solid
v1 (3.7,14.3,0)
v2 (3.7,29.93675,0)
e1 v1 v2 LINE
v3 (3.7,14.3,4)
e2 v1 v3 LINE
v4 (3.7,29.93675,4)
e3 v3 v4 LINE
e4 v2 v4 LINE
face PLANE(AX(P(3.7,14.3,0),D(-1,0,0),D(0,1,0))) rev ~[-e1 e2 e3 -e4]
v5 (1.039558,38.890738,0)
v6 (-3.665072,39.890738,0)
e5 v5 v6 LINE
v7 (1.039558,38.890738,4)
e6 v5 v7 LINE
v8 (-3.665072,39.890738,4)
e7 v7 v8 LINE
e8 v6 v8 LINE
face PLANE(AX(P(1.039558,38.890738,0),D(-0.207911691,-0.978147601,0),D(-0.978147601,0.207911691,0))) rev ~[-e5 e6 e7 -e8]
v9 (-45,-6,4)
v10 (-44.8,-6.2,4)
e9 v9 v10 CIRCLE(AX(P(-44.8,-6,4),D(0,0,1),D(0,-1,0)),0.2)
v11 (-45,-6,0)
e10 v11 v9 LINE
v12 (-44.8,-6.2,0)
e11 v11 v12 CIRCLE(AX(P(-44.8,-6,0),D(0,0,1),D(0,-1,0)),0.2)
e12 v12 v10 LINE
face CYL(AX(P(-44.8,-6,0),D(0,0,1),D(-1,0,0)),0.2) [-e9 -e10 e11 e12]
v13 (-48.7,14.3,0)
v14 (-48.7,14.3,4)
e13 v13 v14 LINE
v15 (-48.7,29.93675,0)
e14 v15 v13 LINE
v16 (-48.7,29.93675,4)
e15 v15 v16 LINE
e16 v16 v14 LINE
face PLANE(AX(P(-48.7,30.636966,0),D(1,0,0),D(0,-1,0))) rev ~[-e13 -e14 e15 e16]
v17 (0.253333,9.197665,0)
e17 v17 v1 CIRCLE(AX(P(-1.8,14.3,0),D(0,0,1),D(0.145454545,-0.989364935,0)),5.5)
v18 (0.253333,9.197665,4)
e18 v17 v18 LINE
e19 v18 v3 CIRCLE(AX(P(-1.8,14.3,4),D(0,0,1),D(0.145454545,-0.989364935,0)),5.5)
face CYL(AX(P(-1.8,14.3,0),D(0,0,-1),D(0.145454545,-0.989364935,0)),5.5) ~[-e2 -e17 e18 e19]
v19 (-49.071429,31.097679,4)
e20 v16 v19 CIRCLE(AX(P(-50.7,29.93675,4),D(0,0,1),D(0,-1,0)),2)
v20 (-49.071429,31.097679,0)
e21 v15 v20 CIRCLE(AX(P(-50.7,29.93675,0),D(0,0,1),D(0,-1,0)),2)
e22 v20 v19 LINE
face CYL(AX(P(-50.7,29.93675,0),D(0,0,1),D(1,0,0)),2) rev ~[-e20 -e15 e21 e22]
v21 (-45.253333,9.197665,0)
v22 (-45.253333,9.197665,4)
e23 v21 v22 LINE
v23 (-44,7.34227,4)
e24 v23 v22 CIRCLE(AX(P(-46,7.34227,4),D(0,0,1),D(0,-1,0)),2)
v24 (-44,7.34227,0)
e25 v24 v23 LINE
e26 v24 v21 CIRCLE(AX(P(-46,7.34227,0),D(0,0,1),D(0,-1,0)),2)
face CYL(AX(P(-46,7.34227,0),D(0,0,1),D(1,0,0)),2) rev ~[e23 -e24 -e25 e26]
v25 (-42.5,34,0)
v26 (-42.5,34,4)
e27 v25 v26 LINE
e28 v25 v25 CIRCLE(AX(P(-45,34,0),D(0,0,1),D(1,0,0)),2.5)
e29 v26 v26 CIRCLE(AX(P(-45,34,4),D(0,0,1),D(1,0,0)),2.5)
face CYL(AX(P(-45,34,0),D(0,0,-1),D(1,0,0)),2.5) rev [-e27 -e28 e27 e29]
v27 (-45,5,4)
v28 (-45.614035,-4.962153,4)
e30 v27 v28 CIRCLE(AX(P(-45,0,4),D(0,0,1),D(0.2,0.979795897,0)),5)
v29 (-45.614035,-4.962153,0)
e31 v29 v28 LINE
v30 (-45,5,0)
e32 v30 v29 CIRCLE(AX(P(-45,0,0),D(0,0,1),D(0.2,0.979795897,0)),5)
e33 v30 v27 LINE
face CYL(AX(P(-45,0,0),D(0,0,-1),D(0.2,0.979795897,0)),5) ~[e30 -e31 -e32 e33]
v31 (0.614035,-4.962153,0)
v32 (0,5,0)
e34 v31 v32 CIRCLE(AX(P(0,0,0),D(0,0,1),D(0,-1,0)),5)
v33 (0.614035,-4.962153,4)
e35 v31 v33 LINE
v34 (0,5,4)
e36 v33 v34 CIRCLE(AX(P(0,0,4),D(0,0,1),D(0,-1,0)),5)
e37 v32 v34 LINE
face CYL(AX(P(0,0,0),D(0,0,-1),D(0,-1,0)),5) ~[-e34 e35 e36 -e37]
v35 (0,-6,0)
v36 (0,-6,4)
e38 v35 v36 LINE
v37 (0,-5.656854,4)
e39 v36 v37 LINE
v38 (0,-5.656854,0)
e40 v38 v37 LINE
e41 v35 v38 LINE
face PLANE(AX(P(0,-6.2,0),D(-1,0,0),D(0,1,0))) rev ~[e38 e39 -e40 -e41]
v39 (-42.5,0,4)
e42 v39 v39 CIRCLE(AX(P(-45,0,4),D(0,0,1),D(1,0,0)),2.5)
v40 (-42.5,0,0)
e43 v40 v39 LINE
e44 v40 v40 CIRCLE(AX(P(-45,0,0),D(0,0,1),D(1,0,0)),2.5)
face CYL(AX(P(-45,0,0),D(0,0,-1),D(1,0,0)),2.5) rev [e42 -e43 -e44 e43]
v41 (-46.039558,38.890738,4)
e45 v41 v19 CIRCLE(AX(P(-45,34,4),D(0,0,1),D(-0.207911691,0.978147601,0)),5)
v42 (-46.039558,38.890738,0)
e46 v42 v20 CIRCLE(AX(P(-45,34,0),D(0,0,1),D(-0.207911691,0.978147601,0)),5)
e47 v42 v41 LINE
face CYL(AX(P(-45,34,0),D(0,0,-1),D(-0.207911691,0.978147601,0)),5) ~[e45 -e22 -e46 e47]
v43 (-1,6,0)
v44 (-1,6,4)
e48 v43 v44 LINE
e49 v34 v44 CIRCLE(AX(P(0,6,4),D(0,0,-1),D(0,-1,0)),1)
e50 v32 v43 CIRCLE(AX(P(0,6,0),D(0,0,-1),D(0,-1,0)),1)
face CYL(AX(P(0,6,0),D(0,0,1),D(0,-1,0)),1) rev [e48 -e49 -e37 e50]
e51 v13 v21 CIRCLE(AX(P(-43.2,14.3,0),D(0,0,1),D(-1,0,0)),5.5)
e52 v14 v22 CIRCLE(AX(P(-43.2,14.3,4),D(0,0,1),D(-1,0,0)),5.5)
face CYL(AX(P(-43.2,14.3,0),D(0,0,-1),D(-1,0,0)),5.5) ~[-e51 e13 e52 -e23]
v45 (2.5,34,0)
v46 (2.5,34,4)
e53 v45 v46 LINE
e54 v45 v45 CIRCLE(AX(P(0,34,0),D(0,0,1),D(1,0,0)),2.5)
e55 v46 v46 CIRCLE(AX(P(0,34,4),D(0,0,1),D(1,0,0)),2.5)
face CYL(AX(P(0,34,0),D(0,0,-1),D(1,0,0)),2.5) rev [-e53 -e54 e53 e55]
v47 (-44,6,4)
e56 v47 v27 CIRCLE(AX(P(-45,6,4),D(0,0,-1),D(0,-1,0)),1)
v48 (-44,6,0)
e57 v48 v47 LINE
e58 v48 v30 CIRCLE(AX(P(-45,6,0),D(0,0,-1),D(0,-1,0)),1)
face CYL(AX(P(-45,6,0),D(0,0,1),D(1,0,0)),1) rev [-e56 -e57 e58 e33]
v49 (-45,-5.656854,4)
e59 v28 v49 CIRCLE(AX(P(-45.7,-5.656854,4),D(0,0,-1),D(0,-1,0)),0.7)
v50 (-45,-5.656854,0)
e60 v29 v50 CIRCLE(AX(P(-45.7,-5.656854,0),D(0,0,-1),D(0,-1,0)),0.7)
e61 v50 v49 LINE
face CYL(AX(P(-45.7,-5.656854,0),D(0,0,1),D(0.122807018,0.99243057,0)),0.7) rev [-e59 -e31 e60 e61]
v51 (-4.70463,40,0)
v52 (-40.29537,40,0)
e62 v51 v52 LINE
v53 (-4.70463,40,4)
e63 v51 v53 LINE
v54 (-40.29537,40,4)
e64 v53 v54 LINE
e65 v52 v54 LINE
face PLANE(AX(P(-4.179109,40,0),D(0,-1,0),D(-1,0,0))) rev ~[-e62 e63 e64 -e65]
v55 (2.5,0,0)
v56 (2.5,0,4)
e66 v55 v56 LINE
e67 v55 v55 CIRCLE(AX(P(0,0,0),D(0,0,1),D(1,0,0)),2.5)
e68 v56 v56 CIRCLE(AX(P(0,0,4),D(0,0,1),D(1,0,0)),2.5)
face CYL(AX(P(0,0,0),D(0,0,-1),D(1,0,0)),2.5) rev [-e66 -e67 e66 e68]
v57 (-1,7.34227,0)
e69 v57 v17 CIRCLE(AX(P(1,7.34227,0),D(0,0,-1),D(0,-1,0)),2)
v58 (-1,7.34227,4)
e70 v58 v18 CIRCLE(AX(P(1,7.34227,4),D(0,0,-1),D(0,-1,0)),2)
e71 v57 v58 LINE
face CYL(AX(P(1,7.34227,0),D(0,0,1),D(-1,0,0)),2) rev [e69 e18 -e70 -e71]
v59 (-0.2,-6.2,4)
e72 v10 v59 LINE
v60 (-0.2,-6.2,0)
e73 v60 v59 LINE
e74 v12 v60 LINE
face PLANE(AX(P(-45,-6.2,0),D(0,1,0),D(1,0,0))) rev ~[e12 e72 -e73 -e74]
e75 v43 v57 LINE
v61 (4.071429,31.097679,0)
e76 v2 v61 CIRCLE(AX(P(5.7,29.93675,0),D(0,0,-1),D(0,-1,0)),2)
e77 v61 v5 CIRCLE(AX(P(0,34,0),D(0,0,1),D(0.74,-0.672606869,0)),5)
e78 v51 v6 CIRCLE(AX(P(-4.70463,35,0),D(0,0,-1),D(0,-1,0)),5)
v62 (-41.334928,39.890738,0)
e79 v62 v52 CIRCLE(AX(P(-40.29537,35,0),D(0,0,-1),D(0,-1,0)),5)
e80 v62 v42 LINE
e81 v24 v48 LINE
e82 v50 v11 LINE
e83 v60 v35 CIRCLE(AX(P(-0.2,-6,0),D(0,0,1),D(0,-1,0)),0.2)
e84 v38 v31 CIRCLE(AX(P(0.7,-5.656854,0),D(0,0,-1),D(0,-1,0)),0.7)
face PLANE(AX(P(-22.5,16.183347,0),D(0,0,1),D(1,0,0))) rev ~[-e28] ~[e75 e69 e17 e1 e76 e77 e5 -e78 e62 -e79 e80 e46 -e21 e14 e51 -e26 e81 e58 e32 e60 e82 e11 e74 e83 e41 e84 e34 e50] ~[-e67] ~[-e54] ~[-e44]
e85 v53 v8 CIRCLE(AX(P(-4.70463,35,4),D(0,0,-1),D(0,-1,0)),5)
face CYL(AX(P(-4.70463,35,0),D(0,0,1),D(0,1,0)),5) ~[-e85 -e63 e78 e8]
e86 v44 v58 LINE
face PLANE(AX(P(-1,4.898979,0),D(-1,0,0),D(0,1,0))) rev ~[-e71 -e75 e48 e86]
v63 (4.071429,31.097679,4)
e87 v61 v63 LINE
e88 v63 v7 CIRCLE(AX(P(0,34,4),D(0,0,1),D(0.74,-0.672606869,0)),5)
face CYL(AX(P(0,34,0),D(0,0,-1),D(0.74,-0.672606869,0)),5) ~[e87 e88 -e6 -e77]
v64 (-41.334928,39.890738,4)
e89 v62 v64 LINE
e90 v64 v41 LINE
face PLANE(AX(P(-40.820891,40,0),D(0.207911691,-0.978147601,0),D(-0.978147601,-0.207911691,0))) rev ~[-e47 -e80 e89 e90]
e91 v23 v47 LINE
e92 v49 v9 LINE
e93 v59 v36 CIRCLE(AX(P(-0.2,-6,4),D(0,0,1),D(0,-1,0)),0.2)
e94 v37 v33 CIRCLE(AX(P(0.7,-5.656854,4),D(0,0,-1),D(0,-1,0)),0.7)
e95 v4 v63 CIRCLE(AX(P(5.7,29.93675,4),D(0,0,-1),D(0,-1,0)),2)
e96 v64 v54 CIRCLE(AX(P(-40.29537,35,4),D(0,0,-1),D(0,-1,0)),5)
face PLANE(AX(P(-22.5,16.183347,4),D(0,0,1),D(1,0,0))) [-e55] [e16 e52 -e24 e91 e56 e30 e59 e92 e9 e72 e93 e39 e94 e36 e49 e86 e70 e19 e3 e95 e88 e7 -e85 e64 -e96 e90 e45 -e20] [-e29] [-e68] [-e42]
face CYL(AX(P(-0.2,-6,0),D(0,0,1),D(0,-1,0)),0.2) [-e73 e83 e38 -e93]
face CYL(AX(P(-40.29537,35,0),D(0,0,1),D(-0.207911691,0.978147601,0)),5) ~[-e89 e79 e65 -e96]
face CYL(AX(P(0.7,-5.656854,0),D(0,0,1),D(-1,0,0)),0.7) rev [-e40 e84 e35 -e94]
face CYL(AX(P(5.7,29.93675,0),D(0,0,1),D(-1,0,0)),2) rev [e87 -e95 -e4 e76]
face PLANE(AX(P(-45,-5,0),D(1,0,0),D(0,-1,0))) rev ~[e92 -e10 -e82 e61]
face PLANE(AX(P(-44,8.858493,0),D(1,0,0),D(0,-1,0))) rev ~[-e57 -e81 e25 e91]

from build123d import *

# Parameters (mm, degrees)
F0_R     = 2.5
F1_DEPTH = 4
F2_R     = 2
F3_R     = 1
F4_R     = 0.7
F5_R     = 0.2
F6_R     = 2
F7_R     = 5


with BuildPart() as f1:
    # F0 (on Top) → F1 (new body)
    with BuildSketch(Plane.XY):
        with BuildLine():
            Line((-44, 8.8584928558), (-44, 4.8989794856))
            ThreePointArc((-44, 4.8989794856), (-49.974680765, 0.50254481), (-45, -5))
            Line((-45, -5), (-45, -6.2))
            Line((-45, -6.2), (0, -6.2))
            Line((0, -6.2), (0, -5))
            ThreePointArc((0, -5), (4.974680765, 0.50254481), (-1, 4.8989794856))
            Line((-1, 4.8989794856), (-1, 8.8584928558))
            ThreePointArc((-1, 8.8584928558), (2.3623310777, 10.7048643976), (3.7, 14.3))
            Line((3.7, 14.3), (3.7, 30.6369656558))
            ThreePointArc((3.7, 30.6369656558), (4.7588909504, 35.5339351103), (1.0395584541, 38.8907380037))
            Line((1.0395584541, 38.8907380037), (-4.1791089332, 40))
            Line((-4.1791089332, 40), (-40.8208910668, 40))
            Line((-40.8208910668, 40), (-46.0395584541, 38.8907380037))
            ThreePointArc((-46.0395584541, 38.8907380037), (-49.7588909504, 35.5339351103), (-48.7, 30.6369656558))
            Line((-48.7, 30.6369656558), (-48.7, 14.3))
            ThreePointArc((-48.7, 14.3), (-47.3623310777, 10.7048643976), (-44, 8.8584928558))
        make_face()
        with Locations((-45, 0)):
            Circle(F0_R, mode=Mode.SUBTRACT)
        Circle(F0_R, mode=Mode.SUBTRACT)
        with Locations((-45, 34)):
            Circle(F0_R, mode=Mode.SUBTRACT)
        with Locations((0, 34)):
            Circle(F0_R, mode=Mode.SUBTRACT)
    extrude(amount=F1_DEPTH)

    # F2
    f2_edges = [f1.edges().sort_by_distance(p)[0] for p in [
        (-44, 8.858493, 2),
        (-1, 8.858493, 2),
    ]]
    fillet(f2_edges, radius=F2_R)

    # F3
    f3_edges = [f1.edges().sort_by_distance(p)[0] for p in [
        (-1, 4.898979, 2),
        (-44, 4.898979, 2),
    ]]
    fillet(f3_edges, radius=F3_R)

    # F4
    f4_edges = [f1.edges().sort_by_distance(p)[0] for p in [
        (-45, -5, 2),
        (0, -5, 2),
    ]]
    fillet(f4_edges, radius=F4_R)

    # F5
    f5_edges = [f1.edges().sort_by_distance(p)[0] for p in [
        (-45, -6.2, 2),
        (0, -6.2, 2),
    ]]
    fillet(f5_edges, radius=F5_R)

    # F6
    f6_edges = [f1.edges().sort_by_distance(p)[0] for p in [
        (-48.7, 30.636966, 2),
        (3.7, 30.636966, 2),
    ]]
    fillet(f6_edges, radius=F6_R)

    # F7
    f7_edges = [f1.edges().sort_by_distance(p)[0] for p in [
        (-40.820891, 40, 2),
        (-4.179109, 40, 2),
    ]]
    fillet(f7_edges, radius=F7_R)


solid = f1.part
